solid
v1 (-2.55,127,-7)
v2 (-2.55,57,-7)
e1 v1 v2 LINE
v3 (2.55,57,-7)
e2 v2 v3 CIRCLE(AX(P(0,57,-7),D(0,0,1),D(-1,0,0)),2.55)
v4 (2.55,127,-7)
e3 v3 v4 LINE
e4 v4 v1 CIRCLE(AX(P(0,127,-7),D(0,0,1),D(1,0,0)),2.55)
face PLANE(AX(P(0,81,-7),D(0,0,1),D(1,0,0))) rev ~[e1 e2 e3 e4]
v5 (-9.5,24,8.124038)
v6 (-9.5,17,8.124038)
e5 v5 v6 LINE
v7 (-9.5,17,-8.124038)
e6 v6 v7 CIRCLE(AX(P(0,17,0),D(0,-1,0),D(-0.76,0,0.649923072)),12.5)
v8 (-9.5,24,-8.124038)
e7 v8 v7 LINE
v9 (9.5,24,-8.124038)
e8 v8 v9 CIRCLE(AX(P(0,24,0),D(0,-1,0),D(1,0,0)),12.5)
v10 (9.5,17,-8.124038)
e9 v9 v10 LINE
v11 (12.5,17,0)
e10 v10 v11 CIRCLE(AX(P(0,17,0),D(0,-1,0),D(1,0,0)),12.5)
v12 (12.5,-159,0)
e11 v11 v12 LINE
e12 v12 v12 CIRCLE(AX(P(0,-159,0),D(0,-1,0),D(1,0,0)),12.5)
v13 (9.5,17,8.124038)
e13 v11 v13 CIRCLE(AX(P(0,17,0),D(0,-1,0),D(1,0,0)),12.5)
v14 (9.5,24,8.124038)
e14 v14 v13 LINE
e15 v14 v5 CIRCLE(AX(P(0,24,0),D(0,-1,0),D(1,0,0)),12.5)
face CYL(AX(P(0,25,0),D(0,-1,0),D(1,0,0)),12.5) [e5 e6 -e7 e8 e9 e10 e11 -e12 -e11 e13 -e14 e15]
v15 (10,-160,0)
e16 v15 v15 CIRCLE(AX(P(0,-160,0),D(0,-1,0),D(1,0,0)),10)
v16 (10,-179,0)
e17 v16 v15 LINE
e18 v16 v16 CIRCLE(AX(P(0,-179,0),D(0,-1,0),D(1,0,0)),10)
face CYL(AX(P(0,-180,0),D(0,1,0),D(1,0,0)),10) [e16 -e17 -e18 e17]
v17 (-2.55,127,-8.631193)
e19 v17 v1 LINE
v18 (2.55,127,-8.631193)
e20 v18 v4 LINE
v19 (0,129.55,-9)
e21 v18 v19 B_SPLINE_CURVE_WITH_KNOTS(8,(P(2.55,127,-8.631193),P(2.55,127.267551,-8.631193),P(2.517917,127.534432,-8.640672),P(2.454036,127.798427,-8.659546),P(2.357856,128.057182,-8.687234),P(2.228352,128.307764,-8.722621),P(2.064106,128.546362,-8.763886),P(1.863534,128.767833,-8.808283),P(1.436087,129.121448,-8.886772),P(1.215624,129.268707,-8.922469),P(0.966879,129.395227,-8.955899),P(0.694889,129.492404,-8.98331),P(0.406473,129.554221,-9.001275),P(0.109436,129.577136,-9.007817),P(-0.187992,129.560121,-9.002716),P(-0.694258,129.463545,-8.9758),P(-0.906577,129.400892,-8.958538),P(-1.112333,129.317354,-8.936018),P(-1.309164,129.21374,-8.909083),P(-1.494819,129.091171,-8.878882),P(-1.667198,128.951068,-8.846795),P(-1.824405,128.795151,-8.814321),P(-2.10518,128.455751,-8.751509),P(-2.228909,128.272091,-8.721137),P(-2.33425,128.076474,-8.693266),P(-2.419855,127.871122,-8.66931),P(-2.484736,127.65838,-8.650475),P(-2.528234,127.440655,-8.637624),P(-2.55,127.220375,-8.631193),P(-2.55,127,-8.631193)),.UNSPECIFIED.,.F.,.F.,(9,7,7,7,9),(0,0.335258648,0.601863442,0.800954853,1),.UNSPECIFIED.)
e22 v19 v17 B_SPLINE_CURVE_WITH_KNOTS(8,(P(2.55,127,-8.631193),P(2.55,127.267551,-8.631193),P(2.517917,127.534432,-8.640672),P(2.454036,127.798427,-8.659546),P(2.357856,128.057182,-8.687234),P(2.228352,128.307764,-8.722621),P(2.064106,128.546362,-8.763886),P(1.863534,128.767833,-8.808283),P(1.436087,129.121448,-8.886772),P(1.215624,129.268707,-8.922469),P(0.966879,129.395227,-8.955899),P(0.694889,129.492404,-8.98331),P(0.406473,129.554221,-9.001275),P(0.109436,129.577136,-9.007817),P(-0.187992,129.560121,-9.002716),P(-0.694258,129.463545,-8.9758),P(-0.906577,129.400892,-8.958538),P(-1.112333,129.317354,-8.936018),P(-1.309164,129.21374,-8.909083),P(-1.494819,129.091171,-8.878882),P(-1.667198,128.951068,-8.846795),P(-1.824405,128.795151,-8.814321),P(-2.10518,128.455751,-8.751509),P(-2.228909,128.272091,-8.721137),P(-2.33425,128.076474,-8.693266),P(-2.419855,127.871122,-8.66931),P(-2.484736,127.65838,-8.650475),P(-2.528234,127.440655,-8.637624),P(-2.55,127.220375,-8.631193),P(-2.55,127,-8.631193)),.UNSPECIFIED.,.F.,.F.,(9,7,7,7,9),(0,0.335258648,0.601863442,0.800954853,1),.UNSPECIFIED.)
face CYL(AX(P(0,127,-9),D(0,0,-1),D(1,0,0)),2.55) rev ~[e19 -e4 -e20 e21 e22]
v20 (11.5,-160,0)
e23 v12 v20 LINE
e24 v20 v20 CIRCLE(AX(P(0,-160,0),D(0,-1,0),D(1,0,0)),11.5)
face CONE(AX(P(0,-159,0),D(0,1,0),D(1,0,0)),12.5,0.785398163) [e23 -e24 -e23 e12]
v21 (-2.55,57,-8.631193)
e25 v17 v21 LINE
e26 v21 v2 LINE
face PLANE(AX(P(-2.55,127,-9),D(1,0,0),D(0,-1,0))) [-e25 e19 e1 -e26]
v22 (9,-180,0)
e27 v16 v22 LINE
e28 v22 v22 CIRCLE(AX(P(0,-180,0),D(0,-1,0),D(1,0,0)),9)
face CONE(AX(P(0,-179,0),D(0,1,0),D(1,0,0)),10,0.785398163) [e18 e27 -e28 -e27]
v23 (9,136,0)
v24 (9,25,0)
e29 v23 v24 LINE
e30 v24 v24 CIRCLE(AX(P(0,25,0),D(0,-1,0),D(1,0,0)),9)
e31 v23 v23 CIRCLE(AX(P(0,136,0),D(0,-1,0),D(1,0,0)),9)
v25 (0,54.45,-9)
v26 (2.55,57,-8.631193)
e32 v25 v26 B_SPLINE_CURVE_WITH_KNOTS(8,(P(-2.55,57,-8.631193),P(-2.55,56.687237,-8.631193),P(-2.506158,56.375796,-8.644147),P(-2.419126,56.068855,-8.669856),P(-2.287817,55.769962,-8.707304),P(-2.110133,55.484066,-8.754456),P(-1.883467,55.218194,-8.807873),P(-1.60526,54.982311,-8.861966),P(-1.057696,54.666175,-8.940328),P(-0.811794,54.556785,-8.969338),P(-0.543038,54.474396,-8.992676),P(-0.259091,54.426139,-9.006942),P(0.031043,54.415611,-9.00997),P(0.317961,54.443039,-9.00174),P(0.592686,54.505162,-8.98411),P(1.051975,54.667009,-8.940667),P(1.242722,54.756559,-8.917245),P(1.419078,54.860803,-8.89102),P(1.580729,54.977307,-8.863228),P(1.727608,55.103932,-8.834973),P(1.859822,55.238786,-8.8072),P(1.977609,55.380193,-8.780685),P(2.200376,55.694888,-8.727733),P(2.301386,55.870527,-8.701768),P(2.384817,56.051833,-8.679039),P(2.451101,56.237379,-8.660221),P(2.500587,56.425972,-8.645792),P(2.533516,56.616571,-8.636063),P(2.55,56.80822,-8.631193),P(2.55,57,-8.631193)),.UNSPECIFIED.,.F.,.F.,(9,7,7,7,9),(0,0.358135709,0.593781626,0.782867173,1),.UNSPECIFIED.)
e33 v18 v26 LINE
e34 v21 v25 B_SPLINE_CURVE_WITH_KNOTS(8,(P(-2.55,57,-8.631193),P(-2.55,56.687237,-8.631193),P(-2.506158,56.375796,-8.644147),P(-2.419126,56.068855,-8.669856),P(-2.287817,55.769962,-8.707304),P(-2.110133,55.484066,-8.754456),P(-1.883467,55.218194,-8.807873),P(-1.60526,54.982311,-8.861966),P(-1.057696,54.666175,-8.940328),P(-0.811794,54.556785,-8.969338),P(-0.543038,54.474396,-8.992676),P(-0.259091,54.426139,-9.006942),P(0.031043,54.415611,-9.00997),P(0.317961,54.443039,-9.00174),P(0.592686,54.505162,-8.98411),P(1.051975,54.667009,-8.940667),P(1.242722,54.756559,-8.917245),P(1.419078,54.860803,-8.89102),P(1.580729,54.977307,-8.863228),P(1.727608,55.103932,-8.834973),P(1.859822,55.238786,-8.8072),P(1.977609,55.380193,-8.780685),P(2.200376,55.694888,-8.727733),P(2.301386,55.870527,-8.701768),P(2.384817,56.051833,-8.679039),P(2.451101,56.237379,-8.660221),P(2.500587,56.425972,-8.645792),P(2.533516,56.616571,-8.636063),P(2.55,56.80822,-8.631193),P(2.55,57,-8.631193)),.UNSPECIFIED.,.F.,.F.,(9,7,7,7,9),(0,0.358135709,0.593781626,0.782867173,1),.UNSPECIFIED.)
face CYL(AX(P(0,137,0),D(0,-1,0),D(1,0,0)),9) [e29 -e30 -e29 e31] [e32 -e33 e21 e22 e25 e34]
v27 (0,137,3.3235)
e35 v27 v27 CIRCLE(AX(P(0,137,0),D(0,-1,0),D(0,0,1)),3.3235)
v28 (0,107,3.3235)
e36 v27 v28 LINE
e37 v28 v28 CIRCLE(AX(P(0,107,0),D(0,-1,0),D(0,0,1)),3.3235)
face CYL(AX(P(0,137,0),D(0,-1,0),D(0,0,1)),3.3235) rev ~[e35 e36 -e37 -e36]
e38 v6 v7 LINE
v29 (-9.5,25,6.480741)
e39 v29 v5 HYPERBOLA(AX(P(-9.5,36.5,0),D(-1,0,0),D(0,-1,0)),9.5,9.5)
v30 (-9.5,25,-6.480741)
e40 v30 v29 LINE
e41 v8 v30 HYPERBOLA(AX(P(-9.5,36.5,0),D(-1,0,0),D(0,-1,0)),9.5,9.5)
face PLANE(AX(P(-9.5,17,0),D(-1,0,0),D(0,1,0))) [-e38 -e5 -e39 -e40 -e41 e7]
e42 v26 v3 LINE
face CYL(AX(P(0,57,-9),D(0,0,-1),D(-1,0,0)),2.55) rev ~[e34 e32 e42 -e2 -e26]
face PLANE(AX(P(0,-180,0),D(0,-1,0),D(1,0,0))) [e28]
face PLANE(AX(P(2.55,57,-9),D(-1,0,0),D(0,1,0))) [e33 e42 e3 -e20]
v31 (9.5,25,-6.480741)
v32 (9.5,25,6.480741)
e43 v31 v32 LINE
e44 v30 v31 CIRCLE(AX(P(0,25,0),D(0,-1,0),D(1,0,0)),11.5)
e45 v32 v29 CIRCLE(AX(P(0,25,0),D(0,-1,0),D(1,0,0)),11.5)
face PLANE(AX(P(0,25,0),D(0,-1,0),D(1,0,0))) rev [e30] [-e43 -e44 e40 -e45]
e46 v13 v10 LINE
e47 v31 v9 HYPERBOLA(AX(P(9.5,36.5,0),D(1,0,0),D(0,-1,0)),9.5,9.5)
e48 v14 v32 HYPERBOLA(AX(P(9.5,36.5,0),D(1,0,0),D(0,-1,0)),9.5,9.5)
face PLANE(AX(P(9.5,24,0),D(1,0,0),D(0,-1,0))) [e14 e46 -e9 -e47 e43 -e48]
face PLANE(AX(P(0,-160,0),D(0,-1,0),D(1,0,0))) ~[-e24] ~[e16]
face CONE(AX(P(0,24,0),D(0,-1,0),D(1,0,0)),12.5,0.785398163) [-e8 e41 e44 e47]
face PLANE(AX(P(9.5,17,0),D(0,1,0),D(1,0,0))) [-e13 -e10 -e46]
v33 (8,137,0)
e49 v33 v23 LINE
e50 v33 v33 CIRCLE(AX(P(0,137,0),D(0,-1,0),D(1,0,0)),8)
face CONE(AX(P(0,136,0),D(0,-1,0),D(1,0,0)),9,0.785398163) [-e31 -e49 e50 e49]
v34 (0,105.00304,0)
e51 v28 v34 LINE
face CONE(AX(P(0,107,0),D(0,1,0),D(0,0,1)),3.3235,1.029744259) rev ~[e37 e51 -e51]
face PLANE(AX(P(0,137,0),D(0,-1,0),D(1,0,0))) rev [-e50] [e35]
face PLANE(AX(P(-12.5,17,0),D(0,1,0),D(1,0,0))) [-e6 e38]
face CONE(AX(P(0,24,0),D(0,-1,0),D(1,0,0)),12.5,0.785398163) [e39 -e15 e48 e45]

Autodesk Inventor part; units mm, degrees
ref_plane "YZ Plane" through (0, 0, 0) normal (1, 0, 0) x (0, 1, 0)
ref_plane "XZ Plane" through (0, 0, 0) normal (0, 1, 0) x (-1, 0, 0)
sketch "Эскиз1" plane through (0, 0, 0) normal (0, 0, 1) x (1, 0, 0)
  line L0 (0, 137) -> (0, -200)
  line L1 (0, 137) -> (9, 137)
  line L2 (9, 137) -> (9, 25)
  line L3 (9, 25) -> (12.5, 25)
  line L4 (12.5, 25) -> (12.5, -180)
  line L5 (12.5, -180) -> (0, -180)
  line L6 (10, -180) -> (10, -160)
  line L7 (10, -160) -> (12.5, -160)
  point P0 (0, 0)
  point P1 (0, -177.0364)
  dimension "d1" = 200
  dimension "d2" = 18
  dimension "d3" = 25
  dimension "d7" = 25
  dimension "d8" = 137
  dimension "d16" = 180
  dimension "d17" = 20
  dimension "d18" = 20
revolve "Вращение1" add sketch "Эскиз1" angle 360 about axis through (0, 137, 0) along (0, -1, 0) contours L1 L2 L3 L4 L7 L6 L5 L0
sketch "Эскиз2" plane through (0, 137, 0) normal (0, 1, 0) x (1, 0, 0)
  point P0 (0, 0)
hole "Отверстие1" at (0, 137, 0) direction (0, -1, 0) diameter 6.647 depth 30 tip angle 118 thread size "M8x1.25" class "6H" standard "ISO Metric profile"
thread "Резьба1" size "M20x2.5" class "6g" standard "ISO Metric profile" full length
ref_plane "РабПлоскость1" through (0, 81, -9) normal (0, 0, 1) x (1, 0, 0)
sketch "Эскиз3" plane through (0, 81, -9) normal (0, 0, 1) x (1, 0, 0)
  line L0 (0, 46) -> (0, -24) construction
  line L1 (-2.55, 46) -> (-2.55, -24)
  line L2 (2.55, -24) -> (2.55, 46)
  arc A0 (2.55, 46) -> (-2.55, 46) centre (0, 46) ccw
  arc A1 (-2.55, -24) -> (2.55, -24) centre (0, -24) ccw
  line L3 (-9, 56) -> (9, 56) projected
  point P0 (0, -81)
  point P1 (0, 11)
  point P2 (0, 56)
  dimension "d21" = 10
  dimension "d22" = 70
  dimension "d23" = 5.1
extrude "Выдавливание1" cut sketch "Эскиз3" along normal blind 2
chamfer "Chamfer1" distance 1 angle 45 4 edges at (-9, 137, 0) (-12.5, 25, 0) (-12.5, -160, 0) (-10, -180, 0)
sketch "Sketch4" plane through (0, 0, 0) normal (0, 0, 1) x (1, 0, 0)
  line L0 (12.5, 24) -> (-12.5, 24) projected
  line L1 (-12.5, -159) -> (12.5, -159) projected
  line L2 (-11.5, 25) -> (11.5, 25) projected
  line L3 (12.5, 24) -> (-12.5, 24) projected
  line L4 (-11.5, 25) -> (11.5, 25) projected
  line L5 (9.5, 25) -> (9.5, 17)
  line L6 (9.5, 17) -> (12.5, 17)
  line L7 (-12.5, 17) -> (-9.5, 17)
  line L8 (-9.5, 17) -> (-9.5, 25)
  line L9 (-9, 25) -> (9, 25) projected
  line L10 (0, 25) -> (0, 9.8425) construction
  line L11 (12.5, 24) -> (-12.5, 24) projected
  line L12 (12.5, 24) -> (12.5, 17)
  line L13 (11.5, 25) -> (12.5, 24)
  line L14 (11.5, 25) -> (12.5, 24) projected
  line L15 (-11.5, 25) -> (-12.5, 24)
  line L16 (-11.5, 25) -> (-12.5, 24) projected
  line L17 (-12.5, 17) -> (-12.5, 24)
  line L18 (-12.5, 24) -> (-12.5, -159) projected
  point P0 (0, 0)
  dimension "d29" = 19
  dimension "d30" = 8
extrude "Extrusion2" cut sketch "Sketch4" along normal through all both and the other way through all contours L12 L6 L5 L0 | L0 L5 L2 L13 | L8 L7 L17 L0 | L0 L15 L2 L8
properties part number "Вал"
